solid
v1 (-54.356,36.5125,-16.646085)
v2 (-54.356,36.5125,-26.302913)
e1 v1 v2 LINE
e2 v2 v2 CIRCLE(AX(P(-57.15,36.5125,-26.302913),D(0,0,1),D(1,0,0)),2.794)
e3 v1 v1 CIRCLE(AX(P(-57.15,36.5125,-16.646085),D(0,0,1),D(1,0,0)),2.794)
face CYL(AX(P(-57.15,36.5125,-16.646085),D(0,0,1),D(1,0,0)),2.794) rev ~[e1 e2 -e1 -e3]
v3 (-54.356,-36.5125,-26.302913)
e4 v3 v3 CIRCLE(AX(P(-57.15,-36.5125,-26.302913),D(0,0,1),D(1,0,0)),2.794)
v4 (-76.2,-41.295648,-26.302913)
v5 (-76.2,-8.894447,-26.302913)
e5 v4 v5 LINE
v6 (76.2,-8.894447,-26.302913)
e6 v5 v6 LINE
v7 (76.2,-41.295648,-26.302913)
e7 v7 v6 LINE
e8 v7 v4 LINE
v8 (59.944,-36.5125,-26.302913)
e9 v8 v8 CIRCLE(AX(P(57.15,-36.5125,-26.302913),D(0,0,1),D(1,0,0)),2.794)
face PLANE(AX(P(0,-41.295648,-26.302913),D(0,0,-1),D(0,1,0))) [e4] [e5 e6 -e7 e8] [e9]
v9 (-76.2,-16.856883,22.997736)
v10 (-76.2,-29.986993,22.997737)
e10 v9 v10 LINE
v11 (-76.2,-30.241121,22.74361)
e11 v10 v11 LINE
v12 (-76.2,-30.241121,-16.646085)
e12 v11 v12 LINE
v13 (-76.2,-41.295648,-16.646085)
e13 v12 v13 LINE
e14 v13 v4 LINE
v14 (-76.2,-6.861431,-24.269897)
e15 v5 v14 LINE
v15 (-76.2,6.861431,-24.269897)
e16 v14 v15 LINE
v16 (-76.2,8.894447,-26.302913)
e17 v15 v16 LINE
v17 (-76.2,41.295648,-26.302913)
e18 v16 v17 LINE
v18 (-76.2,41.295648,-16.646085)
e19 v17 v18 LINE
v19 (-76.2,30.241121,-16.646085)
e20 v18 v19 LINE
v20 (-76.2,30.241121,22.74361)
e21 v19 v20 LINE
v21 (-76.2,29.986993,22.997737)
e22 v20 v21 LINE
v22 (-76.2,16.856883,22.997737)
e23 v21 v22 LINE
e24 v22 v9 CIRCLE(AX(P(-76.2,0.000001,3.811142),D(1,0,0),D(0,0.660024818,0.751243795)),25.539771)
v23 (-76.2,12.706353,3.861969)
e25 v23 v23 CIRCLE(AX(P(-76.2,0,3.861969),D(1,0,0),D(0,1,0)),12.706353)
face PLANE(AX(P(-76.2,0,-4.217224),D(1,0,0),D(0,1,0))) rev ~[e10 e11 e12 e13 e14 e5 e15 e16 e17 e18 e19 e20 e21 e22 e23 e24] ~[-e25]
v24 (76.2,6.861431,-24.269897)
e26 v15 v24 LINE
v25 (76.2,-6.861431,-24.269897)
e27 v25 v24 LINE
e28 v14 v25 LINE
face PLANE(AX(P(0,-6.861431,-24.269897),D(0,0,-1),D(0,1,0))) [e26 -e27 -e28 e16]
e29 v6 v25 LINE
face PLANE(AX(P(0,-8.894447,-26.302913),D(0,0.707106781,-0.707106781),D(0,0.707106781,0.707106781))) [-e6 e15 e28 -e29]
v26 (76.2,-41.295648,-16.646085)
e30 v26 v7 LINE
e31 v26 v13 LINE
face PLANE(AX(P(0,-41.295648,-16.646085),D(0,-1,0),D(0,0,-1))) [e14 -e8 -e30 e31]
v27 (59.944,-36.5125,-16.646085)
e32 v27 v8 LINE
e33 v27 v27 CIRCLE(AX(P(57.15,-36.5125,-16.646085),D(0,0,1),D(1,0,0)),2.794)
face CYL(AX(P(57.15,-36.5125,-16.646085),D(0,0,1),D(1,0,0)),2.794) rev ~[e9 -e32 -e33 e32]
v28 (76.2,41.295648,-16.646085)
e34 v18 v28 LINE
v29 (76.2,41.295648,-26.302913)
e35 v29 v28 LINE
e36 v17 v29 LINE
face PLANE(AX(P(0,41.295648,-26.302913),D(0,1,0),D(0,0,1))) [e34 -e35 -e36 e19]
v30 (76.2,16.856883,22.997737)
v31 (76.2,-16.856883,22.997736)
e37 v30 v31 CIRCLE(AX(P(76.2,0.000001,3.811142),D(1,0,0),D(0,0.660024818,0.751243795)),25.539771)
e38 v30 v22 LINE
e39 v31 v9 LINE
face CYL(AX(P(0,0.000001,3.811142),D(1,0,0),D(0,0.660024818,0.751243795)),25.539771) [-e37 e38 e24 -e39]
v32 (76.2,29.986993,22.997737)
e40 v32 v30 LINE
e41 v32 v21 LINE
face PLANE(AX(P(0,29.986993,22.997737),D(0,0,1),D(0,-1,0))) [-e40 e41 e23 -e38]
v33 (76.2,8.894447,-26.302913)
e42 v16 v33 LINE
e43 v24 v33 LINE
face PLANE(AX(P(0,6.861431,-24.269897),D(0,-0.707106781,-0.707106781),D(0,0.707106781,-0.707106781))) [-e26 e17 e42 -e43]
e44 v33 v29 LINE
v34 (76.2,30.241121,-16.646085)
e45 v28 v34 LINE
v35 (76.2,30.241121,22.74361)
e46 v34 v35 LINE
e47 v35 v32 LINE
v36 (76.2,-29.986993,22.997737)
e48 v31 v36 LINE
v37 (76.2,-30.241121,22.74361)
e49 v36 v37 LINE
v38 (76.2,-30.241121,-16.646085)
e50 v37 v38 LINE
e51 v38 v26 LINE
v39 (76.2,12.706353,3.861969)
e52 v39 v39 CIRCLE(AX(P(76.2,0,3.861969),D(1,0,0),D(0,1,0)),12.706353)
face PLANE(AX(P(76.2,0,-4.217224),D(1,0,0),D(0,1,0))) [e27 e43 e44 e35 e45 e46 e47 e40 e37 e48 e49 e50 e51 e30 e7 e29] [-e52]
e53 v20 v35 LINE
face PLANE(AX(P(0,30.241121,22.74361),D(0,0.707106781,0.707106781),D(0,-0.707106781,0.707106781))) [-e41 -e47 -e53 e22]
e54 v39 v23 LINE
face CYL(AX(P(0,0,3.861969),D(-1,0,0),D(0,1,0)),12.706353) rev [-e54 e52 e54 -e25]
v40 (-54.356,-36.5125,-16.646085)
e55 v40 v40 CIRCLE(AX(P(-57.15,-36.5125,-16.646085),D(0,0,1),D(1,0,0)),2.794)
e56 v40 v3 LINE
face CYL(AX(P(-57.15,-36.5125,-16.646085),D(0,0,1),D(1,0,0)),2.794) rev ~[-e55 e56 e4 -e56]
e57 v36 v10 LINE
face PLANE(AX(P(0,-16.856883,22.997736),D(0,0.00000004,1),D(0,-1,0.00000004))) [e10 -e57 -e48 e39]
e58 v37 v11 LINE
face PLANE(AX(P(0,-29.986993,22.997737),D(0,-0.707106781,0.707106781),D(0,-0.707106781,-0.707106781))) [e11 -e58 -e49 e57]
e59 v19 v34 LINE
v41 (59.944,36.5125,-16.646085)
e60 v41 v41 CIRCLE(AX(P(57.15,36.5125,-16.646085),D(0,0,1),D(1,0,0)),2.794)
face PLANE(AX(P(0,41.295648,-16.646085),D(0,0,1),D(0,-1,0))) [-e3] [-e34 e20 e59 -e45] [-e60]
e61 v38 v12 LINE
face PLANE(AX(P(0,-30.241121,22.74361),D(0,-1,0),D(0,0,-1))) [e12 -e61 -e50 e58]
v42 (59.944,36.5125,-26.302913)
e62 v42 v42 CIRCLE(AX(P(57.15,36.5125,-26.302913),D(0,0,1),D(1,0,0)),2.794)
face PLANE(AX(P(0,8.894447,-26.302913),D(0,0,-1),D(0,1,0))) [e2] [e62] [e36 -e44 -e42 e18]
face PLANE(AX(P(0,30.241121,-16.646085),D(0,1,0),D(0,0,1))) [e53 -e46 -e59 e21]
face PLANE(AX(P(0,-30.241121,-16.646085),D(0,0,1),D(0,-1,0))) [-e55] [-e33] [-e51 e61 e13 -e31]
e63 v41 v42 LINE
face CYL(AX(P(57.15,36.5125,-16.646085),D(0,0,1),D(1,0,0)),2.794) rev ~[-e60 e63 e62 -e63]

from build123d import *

# Parameters (mm, degrees)
F0_R     = 12.7063531766
F1_DEPTH = 76.2
F2_R     = 2.794
F3_DEPTH = 9.6578284142


# Not quite as in the source:
# - ends of sketch curves that miss each other by under 0.0002 mm in the source are joined


with BuildPart() as f1:
    # F0 (on Right) → F1 (new body, symmetric)
    with BuildSketch(Plane.YZ):
        with BuildLine():
            Line((-41.2956478239, -26.3029134567), (-8.8944472236, -26.3029134567))
            Line((-8.8944472236, -26.3029134567), (-6.8614307154, -24.2698969485))
            Line((-6.8614307154, -24.2698969485), (6.8614307154, -24.2698969485))
            Line((6.8614307154, -24.2698969485), (8.8944472236, -26.3029134567))
            Line((8.8944472236, -26.3029134567), (41.2956478239, -26.3029134567))
            Line((41.2956478239, -26.3029134567), (41.2956478239, -16.6460850425))
            Line((41.2956478239, -16.6460850425), (30.2411205603, -16.6460850425))
            Line((30.2411205603, -16.6460850425), (30.2411205603, 22.7436098049))
            Line((30.2411205603, 22.7436098049), (29.9869934967, 22.9977368684))
            Line((29.9869934967, 22.9977368684), (16.8568834417, 22.9977368684))
            ThreePointArc((16.8568834417, 22.9977368684), (0, 29.3509134567), (-16.8568829775, 22.9977363401))
            Line((-16.8568829775, 22.9977363401), (-29.9869934967, 22.9977368684))
            Line((-29.9869934967, 22.9977368684), (-30.2411205603, 22.7436098049))
            Line((-30.2411205603, 22.7436098049), (-30.2411205603, -16.6460850425))
            Line((-30.2411205603, -16.6460850425), (-41.2956478239, -16.6460850425))
            Line((-41.2956478239, -16.6460850425), (-41.2956478239, -26.3029134567))
        make_face()
        with Locations((0, 3.8619689845)):
            Circle(F0_R, mode=Mode.SUBTRACT)
    extrude(amount=F1_DEPTH, both=True)

    # F2 (on face) → F3 (cut, through all)
    with BuildSketch(Plane.XY.offset(-16.6460850425)):
        with Locations((57.15, 36.5125)):
            Circle(F2_R)
        with Locations((-57.15, 36.5125)):
            Circle(F2_R)
        with Locations((-57.15, -36.5125)):
            Circle(F2_R)
        with Locations((57.15, -36.5125)):
            Circle(F2_R)
    extrude(amount=-F3_DEPTH, mode=Mode.SUBTRACT)


solid = f1.part
